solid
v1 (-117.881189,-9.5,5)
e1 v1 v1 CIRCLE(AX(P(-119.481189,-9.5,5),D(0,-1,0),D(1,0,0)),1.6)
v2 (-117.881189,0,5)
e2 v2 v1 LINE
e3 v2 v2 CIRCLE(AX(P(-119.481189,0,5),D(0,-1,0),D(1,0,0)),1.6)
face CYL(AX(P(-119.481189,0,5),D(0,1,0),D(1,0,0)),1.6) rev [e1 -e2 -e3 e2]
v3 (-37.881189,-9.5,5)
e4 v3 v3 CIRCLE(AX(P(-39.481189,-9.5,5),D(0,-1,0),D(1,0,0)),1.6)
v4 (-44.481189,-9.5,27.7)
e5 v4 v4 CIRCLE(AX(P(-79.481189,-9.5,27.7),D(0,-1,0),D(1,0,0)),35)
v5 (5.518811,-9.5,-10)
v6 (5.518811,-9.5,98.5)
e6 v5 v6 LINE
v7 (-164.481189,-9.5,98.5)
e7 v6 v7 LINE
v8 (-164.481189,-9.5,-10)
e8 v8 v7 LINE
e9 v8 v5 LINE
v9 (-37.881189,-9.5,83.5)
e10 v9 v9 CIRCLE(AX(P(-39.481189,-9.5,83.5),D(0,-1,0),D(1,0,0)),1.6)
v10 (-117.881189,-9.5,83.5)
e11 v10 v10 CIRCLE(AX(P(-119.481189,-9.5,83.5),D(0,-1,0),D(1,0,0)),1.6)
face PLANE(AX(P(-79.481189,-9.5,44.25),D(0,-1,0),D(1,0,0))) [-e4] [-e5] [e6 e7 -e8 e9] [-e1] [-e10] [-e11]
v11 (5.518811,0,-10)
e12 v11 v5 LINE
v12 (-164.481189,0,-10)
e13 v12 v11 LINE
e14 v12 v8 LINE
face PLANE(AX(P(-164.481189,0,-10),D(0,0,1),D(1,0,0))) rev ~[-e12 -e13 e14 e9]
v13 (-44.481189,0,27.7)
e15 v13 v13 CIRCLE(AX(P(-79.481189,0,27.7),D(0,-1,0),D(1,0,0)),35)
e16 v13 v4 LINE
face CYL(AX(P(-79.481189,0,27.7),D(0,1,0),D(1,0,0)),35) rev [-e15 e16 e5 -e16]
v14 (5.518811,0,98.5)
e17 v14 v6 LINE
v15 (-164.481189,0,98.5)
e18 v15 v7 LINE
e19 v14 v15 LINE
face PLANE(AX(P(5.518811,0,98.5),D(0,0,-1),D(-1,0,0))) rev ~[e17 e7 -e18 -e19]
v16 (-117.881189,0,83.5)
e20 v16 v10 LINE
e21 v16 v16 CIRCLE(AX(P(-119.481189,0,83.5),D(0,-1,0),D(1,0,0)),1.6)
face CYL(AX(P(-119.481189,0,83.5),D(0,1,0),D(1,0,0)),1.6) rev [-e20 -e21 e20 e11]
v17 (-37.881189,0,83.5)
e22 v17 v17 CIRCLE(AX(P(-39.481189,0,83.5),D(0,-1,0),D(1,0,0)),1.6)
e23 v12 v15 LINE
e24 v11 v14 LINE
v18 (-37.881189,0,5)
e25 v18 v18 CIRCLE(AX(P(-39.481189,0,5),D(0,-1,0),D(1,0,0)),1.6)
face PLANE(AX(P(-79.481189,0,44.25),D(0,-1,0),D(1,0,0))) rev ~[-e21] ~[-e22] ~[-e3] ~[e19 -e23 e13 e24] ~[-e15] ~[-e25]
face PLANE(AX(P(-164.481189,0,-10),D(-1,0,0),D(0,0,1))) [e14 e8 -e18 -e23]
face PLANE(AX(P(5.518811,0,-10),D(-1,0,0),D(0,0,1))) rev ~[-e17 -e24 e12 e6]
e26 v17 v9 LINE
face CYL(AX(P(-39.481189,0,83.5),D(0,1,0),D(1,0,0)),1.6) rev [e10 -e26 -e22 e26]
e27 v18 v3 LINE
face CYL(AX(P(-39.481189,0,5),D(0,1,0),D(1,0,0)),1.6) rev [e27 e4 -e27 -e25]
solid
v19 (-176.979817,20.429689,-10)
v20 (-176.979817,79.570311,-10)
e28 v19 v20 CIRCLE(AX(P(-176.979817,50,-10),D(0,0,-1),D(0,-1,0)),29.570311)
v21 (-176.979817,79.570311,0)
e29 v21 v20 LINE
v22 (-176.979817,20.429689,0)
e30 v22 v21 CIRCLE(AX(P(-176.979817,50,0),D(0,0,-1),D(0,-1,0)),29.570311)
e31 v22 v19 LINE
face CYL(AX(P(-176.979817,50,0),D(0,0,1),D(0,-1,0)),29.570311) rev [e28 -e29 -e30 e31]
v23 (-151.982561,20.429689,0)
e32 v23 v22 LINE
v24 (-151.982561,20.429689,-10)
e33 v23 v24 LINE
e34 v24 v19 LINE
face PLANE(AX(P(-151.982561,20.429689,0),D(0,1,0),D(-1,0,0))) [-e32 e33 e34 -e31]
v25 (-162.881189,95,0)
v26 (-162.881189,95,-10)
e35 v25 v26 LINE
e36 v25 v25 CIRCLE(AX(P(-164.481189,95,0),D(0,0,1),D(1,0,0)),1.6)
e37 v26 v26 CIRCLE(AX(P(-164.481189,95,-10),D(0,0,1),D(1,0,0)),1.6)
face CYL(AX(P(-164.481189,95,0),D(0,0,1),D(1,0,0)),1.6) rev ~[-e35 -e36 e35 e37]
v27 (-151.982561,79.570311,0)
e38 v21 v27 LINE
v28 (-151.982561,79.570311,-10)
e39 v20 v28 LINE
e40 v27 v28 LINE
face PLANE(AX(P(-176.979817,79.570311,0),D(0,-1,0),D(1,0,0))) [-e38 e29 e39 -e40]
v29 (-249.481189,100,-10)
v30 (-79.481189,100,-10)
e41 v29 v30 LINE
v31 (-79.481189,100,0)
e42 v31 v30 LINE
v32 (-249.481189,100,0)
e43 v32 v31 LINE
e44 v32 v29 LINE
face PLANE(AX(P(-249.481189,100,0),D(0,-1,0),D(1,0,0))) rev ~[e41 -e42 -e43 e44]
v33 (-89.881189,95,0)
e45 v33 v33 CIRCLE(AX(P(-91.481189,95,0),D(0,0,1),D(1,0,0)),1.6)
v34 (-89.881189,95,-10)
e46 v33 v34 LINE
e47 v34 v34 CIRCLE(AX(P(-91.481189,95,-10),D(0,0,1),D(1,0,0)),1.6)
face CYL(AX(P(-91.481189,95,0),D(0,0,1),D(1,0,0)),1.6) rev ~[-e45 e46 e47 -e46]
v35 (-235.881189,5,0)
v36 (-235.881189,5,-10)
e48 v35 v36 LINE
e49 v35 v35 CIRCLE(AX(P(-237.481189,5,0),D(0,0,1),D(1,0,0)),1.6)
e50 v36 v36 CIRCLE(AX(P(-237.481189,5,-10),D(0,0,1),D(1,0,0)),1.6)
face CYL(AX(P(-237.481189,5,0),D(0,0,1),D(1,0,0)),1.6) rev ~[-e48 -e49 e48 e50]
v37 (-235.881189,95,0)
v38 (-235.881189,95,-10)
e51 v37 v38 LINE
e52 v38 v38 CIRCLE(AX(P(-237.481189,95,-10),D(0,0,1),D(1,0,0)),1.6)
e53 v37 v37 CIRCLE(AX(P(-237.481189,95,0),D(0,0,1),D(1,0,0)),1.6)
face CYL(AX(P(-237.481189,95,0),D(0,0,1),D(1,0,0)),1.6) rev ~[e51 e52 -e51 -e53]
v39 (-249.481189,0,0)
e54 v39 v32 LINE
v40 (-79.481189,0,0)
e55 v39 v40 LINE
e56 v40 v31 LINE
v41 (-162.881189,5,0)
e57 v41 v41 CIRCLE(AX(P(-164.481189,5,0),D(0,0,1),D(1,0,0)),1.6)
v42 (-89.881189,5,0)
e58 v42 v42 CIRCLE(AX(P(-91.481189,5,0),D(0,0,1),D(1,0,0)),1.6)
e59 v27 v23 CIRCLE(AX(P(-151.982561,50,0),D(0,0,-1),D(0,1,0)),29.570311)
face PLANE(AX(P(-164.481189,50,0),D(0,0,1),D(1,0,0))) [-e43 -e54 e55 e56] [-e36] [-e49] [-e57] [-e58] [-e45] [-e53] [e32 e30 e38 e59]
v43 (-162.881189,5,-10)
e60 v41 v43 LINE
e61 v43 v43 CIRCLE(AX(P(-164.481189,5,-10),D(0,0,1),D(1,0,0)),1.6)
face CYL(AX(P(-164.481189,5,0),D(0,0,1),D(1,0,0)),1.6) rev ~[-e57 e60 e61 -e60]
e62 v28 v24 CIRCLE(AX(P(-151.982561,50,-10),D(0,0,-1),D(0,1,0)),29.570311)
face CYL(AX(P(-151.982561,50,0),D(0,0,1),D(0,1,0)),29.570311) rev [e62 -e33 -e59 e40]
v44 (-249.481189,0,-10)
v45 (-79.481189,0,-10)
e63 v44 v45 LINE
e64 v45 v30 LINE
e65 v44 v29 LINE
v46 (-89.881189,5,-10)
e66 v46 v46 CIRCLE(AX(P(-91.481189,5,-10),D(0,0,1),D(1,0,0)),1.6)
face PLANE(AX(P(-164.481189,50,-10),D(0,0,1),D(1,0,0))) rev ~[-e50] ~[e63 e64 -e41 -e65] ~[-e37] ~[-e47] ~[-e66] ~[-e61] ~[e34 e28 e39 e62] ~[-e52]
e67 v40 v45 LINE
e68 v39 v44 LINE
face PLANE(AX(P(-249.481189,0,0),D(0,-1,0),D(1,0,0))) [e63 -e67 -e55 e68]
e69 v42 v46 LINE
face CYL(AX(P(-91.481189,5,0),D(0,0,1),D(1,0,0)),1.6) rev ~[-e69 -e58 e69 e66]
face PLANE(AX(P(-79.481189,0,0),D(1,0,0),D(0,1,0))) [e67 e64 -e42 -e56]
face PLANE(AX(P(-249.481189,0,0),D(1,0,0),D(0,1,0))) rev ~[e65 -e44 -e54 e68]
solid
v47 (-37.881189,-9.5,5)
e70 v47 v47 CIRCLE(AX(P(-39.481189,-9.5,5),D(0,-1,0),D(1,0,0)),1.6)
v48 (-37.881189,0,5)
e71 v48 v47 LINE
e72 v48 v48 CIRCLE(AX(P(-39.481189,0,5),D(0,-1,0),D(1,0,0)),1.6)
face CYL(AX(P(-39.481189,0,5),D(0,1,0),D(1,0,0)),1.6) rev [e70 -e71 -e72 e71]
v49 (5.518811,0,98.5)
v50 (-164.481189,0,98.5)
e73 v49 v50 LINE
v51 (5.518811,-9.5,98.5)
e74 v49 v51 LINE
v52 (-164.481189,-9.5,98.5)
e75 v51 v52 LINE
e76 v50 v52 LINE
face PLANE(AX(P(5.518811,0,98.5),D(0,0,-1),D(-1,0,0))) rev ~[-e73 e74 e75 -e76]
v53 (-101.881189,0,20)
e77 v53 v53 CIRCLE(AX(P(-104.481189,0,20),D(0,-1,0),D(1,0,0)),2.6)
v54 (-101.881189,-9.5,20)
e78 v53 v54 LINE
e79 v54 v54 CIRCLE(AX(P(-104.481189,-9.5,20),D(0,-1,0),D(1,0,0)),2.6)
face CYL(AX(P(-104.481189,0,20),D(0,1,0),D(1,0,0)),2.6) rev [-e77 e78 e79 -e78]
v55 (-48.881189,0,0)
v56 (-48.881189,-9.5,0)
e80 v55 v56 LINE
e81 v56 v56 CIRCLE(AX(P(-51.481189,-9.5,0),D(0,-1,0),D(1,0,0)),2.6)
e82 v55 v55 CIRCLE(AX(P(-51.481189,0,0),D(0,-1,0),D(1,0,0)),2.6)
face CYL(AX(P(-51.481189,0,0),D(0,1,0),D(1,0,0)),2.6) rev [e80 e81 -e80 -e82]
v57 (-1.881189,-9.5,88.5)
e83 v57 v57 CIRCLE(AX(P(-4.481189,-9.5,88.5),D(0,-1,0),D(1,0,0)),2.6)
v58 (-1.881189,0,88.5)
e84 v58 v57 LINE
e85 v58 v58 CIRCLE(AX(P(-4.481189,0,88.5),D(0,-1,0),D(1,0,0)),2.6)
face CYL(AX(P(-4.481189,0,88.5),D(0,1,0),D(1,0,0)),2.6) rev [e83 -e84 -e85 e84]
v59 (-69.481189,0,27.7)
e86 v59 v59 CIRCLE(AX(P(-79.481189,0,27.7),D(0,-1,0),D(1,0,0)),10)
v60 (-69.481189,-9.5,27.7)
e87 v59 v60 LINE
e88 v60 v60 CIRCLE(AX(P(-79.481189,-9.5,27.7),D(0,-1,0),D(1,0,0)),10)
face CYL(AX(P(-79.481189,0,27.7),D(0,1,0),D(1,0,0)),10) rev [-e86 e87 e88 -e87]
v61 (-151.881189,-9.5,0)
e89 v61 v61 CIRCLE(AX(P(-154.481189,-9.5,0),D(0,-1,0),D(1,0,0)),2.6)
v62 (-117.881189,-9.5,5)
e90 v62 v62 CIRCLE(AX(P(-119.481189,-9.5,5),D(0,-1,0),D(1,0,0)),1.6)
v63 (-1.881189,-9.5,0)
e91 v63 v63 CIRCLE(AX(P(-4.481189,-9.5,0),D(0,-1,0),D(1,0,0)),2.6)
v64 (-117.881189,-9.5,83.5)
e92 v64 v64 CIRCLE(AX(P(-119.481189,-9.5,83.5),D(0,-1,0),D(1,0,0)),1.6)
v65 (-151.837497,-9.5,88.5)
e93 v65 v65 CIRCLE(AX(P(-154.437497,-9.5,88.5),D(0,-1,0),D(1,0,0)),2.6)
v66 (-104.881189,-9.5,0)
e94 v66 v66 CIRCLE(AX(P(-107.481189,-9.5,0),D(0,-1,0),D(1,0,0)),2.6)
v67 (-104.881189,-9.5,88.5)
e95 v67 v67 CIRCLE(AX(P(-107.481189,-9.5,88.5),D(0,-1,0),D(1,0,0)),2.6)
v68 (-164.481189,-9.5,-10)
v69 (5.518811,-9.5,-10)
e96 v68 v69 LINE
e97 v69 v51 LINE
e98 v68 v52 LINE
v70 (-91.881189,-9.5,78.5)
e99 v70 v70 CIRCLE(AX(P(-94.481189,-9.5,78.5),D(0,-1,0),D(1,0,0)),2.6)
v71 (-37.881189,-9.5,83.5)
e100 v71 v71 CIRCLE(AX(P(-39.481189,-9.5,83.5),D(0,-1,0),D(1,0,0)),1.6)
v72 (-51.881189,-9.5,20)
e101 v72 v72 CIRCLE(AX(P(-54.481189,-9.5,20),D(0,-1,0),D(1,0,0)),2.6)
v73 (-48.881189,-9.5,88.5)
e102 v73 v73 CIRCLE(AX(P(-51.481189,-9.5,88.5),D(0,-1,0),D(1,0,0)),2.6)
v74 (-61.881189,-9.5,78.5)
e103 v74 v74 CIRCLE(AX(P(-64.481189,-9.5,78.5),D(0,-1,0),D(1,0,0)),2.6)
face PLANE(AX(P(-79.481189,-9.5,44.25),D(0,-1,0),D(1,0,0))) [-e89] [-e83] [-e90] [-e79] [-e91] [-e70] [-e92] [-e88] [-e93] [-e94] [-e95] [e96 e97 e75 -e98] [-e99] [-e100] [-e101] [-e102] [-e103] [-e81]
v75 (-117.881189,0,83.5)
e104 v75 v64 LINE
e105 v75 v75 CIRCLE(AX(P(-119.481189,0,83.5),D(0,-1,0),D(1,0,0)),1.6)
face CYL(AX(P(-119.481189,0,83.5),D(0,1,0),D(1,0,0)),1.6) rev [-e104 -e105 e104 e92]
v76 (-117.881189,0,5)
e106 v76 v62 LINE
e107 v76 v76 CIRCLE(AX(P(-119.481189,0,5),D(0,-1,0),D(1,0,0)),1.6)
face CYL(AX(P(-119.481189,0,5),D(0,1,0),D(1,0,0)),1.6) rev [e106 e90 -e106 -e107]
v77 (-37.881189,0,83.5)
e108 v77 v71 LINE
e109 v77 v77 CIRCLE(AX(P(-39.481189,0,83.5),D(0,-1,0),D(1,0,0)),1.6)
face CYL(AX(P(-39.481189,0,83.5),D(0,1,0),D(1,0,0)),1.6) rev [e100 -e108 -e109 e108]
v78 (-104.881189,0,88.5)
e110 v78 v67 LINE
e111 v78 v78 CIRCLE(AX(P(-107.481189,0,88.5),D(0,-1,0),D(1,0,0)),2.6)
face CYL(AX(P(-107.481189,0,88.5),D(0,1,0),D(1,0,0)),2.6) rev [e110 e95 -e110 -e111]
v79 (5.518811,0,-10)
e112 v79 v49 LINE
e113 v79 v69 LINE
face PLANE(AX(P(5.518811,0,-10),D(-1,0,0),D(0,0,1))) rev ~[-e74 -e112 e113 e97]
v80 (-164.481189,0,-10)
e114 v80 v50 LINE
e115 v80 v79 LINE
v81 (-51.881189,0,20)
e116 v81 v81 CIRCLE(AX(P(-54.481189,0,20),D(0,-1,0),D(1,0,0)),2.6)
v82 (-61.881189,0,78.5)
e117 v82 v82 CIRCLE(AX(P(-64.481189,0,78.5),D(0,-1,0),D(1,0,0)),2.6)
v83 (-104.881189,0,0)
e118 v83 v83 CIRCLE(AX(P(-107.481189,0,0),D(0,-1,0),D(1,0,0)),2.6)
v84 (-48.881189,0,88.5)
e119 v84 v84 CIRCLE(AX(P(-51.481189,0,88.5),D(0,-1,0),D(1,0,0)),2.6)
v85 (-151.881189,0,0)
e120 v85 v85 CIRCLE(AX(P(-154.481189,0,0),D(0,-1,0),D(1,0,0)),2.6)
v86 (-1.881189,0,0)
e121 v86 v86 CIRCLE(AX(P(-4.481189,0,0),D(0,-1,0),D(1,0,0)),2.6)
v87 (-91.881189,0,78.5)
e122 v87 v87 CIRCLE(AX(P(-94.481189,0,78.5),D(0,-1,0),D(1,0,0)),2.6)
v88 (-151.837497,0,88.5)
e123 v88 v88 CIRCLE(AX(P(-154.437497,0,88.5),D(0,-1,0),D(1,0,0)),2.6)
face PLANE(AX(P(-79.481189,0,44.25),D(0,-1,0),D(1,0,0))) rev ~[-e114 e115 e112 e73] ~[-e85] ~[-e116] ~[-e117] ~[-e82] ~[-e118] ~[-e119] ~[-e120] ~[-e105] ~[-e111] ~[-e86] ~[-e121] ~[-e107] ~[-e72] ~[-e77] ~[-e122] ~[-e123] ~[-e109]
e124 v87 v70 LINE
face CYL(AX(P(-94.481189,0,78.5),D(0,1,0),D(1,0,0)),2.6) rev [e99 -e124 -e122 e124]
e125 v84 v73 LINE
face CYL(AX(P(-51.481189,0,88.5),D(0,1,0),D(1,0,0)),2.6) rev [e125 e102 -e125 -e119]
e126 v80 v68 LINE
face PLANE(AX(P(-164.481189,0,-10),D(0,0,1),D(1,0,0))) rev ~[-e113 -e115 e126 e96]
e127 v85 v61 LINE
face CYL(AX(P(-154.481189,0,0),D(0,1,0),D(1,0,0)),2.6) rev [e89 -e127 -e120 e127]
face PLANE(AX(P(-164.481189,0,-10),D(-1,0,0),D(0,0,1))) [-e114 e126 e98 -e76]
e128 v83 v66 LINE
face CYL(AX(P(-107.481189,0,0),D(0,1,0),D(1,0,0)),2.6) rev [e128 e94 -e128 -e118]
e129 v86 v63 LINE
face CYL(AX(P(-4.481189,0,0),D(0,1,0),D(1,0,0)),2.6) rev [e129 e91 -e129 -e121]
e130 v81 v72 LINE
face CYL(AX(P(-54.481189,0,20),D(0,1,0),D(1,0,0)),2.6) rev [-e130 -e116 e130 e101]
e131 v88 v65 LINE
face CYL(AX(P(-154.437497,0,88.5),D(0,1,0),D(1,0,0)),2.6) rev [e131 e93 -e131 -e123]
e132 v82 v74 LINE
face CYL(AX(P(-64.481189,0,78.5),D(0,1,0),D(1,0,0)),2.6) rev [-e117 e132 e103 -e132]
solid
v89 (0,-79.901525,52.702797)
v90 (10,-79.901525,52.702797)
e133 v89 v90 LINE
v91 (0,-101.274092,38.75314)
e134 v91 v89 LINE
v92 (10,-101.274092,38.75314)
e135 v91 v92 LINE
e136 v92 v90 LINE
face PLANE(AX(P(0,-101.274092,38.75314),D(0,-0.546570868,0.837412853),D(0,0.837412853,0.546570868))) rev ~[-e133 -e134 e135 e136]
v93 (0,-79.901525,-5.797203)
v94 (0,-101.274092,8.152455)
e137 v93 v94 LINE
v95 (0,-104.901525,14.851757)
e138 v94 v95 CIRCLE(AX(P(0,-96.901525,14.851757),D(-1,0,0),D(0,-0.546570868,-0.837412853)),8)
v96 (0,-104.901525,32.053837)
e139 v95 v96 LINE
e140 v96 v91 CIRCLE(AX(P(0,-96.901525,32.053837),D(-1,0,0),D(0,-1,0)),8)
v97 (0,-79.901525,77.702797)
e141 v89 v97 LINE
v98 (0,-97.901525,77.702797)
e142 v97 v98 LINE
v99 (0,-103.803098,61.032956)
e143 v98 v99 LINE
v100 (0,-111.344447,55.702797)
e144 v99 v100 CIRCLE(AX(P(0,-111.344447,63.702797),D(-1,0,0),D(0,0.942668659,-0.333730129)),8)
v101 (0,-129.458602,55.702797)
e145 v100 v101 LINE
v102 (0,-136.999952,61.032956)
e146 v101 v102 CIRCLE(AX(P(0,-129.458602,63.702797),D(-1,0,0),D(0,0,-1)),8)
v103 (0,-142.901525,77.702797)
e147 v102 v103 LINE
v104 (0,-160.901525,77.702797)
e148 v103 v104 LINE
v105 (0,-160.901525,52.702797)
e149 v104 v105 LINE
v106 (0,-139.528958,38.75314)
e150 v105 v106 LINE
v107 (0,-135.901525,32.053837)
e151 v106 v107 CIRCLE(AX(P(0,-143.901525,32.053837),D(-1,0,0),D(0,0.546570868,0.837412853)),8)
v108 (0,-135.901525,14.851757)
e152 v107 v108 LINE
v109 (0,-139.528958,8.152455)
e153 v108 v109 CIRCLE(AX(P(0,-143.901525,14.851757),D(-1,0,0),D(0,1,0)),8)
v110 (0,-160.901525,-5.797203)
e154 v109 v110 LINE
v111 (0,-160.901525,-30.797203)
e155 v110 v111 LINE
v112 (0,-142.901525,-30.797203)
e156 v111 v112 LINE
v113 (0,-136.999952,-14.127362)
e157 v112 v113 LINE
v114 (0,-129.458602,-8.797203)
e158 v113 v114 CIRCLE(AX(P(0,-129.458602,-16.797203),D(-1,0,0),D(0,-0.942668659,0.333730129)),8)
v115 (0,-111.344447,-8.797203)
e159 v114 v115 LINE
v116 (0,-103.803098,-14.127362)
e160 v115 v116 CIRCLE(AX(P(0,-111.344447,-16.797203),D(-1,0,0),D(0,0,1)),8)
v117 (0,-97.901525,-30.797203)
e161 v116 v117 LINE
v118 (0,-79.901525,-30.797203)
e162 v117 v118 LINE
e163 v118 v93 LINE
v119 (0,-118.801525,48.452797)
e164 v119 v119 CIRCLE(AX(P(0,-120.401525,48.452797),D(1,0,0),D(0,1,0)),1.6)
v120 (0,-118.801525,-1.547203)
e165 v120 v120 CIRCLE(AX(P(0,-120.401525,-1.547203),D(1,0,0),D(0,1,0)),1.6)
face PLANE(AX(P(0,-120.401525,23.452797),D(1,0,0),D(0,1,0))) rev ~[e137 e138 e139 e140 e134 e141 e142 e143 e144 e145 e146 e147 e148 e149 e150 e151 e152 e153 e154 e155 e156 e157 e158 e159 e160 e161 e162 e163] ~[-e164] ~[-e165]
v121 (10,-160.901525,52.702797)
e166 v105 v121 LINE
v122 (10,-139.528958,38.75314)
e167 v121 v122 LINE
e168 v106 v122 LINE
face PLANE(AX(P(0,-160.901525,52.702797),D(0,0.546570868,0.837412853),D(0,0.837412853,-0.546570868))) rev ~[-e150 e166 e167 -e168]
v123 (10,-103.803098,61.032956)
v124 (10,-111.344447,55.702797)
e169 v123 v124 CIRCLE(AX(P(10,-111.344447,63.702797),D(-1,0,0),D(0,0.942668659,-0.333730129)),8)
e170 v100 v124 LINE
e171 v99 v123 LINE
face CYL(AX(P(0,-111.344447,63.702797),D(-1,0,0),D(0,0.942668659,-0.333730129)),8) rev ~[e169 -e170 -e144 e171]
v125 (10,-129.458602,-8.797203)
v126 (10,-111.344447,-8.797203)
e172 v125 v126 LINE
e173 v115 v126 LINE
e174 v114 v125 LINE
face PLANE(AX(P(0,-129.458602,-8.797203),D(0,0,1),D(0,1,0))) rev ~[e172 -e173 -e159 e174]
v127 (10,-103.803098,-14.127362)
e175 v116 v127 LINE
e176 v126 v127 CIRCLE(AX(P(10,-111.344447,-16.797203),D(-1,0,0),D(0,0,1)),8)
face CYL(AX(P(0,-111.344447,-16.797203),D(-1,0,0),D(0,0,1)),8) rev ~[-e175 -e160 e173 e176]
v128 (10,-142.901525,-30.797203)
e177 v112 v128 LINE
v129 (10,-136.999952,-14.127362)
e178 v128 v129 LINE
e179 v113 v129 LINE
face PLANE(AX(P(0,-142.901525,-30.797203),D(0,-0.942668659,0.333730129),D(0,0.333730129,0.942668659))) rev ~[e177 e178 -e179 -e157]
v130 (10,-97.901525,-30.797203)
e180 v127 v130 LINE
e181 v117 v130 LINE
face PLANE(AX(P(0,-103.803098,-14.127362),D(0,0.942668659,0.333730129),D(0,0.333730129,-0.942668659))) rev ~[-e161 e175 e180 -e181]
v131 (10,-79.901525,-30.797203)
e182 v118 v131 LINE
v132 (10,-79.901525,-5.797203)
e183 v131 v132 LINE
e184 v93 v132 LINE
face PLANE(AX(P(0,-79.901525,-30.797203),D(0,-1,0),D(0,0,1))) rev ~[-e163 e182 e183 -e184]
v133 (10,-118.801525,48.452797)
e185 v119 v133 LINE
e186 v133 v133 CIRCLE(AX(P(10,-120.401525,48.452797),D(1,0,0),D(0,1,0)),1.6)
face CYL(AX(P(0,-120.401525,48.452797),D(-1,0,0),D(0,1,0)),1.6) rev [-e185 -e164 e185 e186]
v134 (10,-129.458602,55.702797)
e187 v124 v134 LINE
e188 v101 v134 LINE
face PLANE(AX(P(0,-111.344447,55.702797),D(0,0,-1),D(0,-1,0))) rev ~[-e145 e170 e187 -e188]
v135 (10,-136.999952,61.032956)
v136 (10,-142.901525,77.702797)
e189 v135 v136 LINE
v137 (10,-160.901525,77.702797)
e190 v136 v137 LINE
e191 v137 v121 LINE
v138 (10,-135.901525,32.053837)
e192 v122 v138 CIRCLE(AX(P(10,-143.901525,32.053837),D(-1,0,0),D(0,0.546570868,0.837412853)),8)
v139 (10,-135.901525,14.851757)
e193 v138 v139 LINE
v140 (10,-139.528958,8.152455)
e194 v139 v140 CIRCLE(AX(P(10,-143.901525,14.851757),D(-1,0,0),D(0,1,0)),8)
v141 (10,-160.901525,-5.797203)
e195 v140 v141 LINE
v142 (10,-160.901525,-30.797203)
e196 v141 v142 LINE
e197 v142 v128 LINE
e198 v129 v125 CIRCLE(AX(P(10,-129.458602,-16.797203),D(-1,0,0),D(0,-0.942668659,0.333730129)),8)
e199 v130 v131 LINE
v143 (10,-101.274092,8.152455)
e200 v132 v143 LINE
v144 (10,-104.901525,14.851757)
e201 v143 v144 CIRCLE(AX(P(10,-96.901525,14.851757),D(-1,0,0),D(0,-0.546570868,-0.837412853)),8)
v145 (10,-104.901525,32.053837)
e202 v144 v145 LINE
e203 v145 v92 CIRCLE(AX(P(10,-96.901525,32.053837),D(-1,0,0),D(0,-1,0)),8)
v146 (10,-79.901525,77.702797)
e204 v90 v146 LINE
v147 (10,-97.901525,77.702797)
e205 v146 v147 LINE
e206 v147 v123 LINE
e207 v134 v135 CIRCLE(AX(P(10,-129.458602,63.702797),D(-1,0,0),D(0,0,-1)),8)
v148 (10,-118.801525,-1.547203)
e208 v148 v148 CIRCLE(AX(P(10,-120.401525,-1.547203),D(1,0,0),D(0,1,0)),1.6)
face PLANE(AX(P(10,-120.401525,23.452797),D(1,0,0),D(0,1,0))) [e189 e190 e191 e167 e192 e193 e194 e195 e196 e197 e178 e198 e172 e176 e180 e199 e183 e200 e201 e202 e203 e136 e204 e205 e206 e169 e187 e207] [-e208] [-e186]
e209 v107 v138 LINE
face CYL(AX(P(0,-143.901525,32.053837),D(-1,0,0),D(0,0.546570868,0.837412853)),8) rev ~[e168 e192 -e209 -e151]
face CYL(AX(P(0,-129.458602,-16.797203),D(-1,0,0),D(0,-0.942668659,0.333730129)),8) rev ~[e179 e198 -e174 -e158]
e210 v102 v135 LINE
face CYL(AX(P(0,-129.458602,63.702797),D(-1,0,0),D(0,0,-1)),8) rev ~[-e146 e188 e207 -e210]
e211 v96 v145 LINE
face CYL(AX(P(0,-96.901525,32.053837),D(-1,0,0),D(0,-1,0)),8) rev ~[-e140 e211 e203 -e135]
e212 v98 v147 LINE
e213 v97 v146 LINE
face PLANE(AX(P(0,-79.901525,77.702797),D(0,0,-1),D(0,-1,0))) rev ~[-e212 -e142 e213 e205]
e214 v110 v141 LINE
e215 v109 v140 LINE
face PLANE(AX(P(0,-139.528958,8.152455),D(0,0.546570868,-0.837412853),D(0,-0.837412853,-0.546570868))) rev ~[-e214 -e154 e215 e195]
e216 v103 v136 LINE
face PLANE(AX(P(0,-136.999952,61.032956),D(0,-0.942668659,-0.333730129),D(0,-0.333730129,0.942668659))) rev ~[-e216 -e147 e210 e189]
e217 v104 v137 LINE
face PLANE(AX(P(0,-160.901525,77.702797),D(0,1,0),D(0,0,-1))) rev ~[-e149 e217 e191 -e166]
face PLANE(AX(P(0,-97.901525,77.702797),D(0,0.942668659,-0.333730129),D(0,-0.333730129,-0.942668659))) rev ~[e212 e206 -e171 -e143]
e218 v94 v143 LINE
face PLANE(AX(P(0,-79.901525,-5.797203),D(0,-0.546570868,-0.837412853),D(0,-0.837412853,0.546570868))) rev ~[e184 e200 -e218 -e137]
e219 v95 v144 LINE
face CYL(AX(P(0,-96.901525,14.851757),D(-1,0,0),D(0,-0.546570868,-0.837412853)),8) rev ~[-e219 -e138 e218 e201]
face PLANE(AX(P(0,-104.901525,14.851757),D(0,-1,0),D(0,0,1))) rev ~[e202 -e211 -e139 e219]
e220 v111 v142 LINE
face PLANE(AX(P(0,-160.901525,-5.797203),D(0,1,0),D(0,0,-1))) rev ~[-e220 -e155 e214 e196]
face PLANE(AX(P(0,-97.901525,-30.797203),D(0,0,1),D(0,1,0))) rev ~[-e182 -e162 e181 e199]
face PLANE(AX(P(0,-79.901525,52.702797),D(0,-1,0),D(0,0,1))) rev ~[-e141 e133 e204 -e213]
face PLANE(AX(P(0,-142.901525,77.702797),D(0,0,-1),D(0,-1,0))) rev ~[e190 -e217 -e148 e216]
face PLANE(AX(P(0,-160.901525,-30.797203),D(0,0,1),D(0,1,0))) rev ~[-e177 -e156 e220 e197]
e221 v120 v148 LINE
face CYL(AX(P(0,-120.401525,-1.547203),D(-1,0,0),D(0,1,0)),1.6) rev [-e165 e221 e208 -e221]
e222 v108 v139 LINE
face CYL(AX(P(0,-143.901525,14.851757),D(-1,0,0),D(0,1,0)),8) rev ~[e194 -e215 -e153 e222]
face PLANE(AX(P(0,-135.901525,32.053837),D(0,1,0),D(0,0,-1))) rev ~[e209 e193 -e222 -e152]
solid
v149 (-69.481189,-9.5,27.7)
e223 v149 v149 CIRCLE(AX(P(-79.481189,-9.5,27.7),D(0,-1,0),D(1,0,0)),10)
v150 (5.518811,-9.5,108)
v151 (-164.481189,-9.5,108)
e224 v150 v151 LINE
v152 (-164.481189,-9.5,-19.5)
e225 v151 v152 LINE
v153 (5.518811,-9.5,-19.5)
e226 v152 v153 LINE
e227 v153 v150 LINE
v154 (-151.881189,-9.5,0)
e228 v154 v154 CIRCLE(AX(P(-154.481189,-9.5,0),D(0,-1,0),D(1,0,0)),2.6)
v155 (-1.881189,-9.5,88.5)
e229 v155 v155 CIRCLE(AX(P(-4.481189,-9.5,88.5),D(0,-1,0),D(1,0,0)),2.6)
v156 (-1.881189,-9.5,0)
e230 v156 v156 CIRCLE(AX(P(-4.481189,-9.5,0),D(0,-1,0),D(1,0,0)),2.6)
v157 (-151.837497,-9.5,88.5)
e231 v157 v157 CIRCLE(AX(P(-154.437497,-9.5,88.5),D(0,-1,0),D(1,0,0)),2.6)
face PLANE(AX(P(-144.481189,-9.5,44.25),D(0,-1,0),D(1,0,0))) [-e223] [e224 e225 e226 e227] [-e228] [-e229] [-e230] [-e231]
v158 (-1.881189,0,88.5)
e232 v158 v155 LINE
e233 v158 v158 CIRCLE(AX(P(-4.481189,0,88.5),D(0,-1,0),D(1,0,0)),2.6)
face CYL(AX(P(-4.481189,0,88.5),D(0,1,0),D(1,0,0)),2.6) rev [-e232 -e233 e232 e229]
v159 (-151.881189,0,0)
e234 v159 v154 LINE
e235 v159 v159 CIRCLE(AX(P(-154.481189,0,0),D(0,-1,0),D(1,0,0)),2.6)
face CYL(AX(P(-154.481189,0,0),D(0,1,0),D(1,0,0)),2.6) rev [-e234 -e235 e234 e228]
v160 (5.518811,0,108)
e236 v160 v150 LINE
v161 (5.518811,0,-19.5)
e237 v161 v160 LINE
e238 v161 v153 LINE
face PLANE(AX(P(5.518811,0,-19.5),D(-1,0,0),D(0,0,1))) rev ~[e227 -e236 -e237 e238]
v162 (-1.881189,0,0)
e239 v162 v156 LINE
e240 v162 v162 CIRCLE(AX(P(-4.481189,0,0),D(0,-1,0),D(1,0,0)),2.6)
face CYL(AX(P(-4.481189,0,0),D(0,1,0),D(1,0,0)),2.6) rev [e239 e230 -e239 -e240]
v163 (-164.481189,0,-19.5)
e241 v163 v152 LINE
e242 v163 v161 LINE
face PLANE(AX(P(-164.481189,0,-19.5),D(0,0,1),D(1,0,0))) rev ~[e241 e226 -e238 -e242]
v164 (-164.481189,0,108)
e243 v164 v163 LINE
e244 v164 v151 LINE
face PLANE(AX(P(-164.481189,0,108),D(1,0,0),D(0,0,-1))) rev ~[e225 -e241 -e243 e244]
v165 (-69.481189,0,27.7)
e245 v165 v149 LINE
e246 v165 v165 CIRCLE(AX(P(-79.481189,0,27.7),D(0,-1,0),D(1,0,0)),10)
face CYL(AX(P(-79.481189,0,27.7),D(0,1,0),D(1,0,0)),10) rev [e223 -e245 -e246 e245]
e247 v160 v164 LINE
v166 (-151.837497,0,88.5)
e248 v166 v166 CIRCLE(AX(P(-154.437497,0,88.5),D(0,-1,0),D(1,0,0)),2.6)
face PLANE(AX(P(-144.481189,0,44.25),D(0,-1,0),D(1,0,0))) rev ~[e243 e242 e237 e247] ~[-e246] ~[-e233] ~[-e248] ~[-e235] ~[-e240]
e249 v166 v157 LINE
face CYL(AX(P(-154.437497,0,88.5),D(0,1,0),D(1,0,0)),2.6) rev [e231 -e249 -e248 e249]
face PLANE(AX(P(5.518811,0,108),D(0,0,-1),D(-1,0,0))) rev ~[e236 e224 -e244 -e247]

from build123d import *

# Parameters (mm, degrees)
F0_W     = 90
F0_H     = 108.5
F0_R     = 2.6
F0_R_2   = 1.6
F0_R_3   = 35
F0_R_4   = 10
F0_W_2   = 40
F1_DEPTH = 9.5
F2_W     = 170
F2_H     = 100
F2_R     = 1.6
F3_DEPTH = 10
F4_R     = 1.6
F5_DEPTH = 10
F6_DEPTH = 9.5
F7_DEPTH = 9.5


# Not quite as in the source:
# - a feature names something its author has since deleted; it is built from what else it names


with BuildPart() as f1:
    # F0 (on Front) → F1 (new body)
    with BuildSketch(Plane.XZ):
        with Locations((-79.4811890348, 44.25)):
            Rectangle(F0_W, F0_H)
        with Locations((-107.4811890348, 0)):
            Circle(F0_R, mode=Mode.SUBTRACT)
        with Locations((-119.4811890348, 5)):
            Circle(F0_R_2, mode=Mode.SUBTRACT)
        with Locations((-51.4811890348, 0)):
            Circle(F0_R, mode=Mode.SUBTRACT)
        with Locations((-39.4811890348, 5)):
            Circle(F0_R_2, mode=Mode.SUBTRACT)
        with Locations((-79.4811890348, 27.7)):
            Circle(F0_R_3, mode=Mode.SUBTRACT)
        with Locations((-119.4811890348, 83.5)):
            Circle(F0_R_2, mode=Mode.SUBTRACT)
        with Locations((-107.4811890348, 88.5)):
            Circle(F0_R, mode=Mode.SUBTRACT)
        with Locations((-94.4811890348, 78.5)):
            Circle(F0_R, mode=Mode.SUBTRACT)
        with Locations((-64.4811890348, 78.5)):
            Circle(F0_R, mode=Mode.SUBTRACT)
        with Locations((-39.4811890348, 83.5)):
            Circle(F0_R_2, mode=Mode.SUBTRACT)
        with Locations((-51.4811890348, 88.5)):
            Circle(F0_R, mode=Mode.SUBTRACT)
        with Locations((-79.4811890348, 27.7)):
            Circle(F0_R_3)
        with Locations((-104.4811890348, 20)):
            Circle(F0_R, mode=Mode.SUBTRACT)
        with Locations((-79.4811890348, 27.7)):
            Circle(F0_R_4, mode=Mode.SUBTRACT)
        with Locations((-54.4811890348, 20)):
            Circle(F0_R, mode=Mode.SUBTRACT)
        with Locations((-144.4811890348, 44.25)):
            Rectangle(F0_W_2, F0_H)
        with Locations((-154.4811890348, 0)):
            Circle(F0_R, mode=Mode.SUBTRACT)
        with Locations((-154.4374972582, 88.5)):
            Circle(F0_R, mode=Mode.SUBTRACT)
        with Locations((-14.4811890348, 44.25)):
            Rectangle(F0_W_2, F0_H)
        with Locations((-4.4811890348, 0)):
            Circle(F0_R, mode=Mode.SUBTRACT)
        with Locations((-4.4811890348, 88.5)):
            Circle(F0_R, mode=Mode.SUBTRACT)
    extrude(amount=F1_DEPTH)


with BuildPart() as f3:
    # F2 (on Top) → F3 (new body)
    with BuildSketch(Plane.XY):
        with Locations((-164.4811890348, 50)):
            Rectangle(F2_W, F2_H)
        with Locations((-237.4811890348, 5)):
            Circle(F2_R, mode=Mode.SUBTRACT)
        with Locations((-164.4811890348, 5)):
            Circle(F2_R, mode=Mode.SUBTRACT)
        with Locations((-91.4811890348, 5)):
            Circle(F2_R, mode=Mode.SUBTRACT)
        with Locations((-237.4811890348, 95)):
            Circle(F2_R, mode=Mode.SUBTRACT)
        with Locations((-164.4811890348, 95)):
            Circle(F2_R, mode=Mode.SUBTRACT)
        with BuildLine():
            Line((-151.9825607538, 20.4296894372), (-176.9798173157, 20.4296894372))
            ThreePointArc((-176.9798173157, 20.4296894372), (-206.5501278786, 50), (-176.9798173157, 79.5703105628))
            Line((-176.9798173157, 79.5703105628), (-151.9825607538, 79.5703105628))
            ThreePointArc((-151.9825607538, 79.5703105628), (-122.412250191, 50), (-151.9825607538, 20.4296894372))
        make_face(mode=Mode.SUBTRACT)
        with Locations((-91.4811890348, 95)):
            Circle(F2_R, mode=Mode.SUBTRACT)
    extrude(amount=-F3_DEPTH)


with BuildPart() as f5:
    # F4 (on Right) → F5 (new body)
    with BuildSketch(Plane.YZ):
        with BuildLine():
            Line((-142.9015249014, 77.7027970647), (-160.9015249014, 77.7027970647))
            Line((-160.9015249014, 77.7027970647), (-160.9015249014, 52.7027970647))
            Line((-160.9015249014, 52.7027970647), (-139.5289579594, 38.7531395972))
            ThreePointArc((-139.5289579594, 38.7531395972), (-136.8665929353, 35.8630010157), (-135.9015249014, 32.0538367724))
            Line((-135.9015249014, 32.0538367724), (-135.9015249014, 14.851757357))
            ThreePointArc((-135.9015249014, 14.851757357), (-136.8665929353, 11.0425931138), (-139.5289579594, 8.1524545323))
            Line((-139.5289579594, 8.1524545323), (-160.9015249014, -5.7972029353))
            Line((-160.9015249014, -5.7972029353), (-160.9015249014, -30.7972029353))
            Line((-160.9015249014, -30.7972029353), (-142.9015249014, -30.7972029353))
            Line((-142.9015249014, -30.7972029353), (-136.9999515848, -14.1273619005))
            ThreePointArc((-136.9999515848, -14.1273619005), (-134.0760297196, -10.2642584124), (-129.4586023124, -8.7972029353))
            Line((-129.4586023124, -8.7972029353), (-111.3444474904, -8.7972029353))
            ThreePointArc((-111.3444474904, -8.7972029353), (-106.7270200832, -10.2642584124), (-103.8030982179, -14.1273619005))
            Line((-103.8030982179, -14.1273619005), (-97.9015249014, -30.7972029353))
            Line((-97.9015249014, -30.7972029353), (-79.9015249014, -30.7972029353))
            Line((-79.9015249014, -30.7972029353), (-79.9015249014, -5.7972029353))
            Line((-79.9015249014, -5.7972029353), (-101.2740918434, 8.1524545323))
            ThreePointArc((-101.2740918434, 8.1524545323), (-103.9364568675, 11.0425931138), (-104.9015249014, 14.851757357))
            Line((-104.9015249014, 14.851757357), (-104.9015249014, 32.0538367724))
            ThreePointArc((-104.9015249014, 32.0538367724), (-103.9364568675, 35.8630010157), (-101.2740918434, 38.7531395972))
            Line((-101.2740918434, 38.7531395972), (-79.9015249014, 52.7027970647))
            Line((-79.9015249014, 52.7027970647), (-79.9015249014, 77.7027970647))
            Line((-79.9015249014, 77.7027970647), (-97.9015249014, 77.7027970647))
            Line((-97.9015249014, 77.7027970647), (-103.8030982179, 61.03295603))
            ThreePointArc((-103.8030982179, 61.03295603), (-106.7270200832, 57.1698525419), (-111.3444474904, 55.7027970647))
            Line((-111.3444474904, 55.7027970647), (-129.4586023124, 55.7027970647))
            ThreePointArc((-129.4586023124, 55.7027970647), (-134.0760297196, 57.1698525419), (-136.9999515848, 61.03295603))
            Line((-136.9999515848, 61.03295603), (-142.9015249014, 77.7027970647))
        make_face()
        with Locations((-120.4015249014, -1.5472029353)):
            Circle(F4_R, mode=Mode.SUBTRACT)
        with Locations((-120.4015249014, 48.4527970647)):
            Circle(F4_R, mode=Mode.SUBTRACT)
    extrude(amount=F5_DEPTH)


with BuildPart() as f6:
    # F0 (on Front) → F6 (new body)
    with BuildSketch(Plane.XZ):
        with Locations((-79.4811890348, 44.25)):
            Rectangle(F0_W, F0_H)
        with Locations((-107.4811890348, 0)):
            Circle(F0_R, mode=Mode.SUBTRACT)
        with Locations((-119.4811890348, 5)):
            Circle(F0_R_2, mode=Mode.SUBTRACT)
        with Locations((-51.4811890348, 0)):
            Circle(F0_R, mode=Mode.SUBTRACT)
        with Locations((-39.4811890348, 5)):
            Circle(F0_R_2, mode=Mode.SUBTRACT)
        with Locations((-79.4811890348, 27.7)):
            Circle(F0_R_3, mode=Mode.SUBTRACT)
        with Locations((-119.4811890348, 83.5)):
            Circle(F0_R_2, mode=Mode.SUBTRACT)
        with Locations((-107.4811890348, 88.5)):
            Circle(F0_R, mode=Mode.SUBTRACT)
        with Locations((-94.4811890348, 78.5)):
            Circle(F0_R, mode=Mode.SUBTRACT)
        with Locations((-64.4811890348, 78.5)):
            Circle(F0_R, mode=Mode.SUBTRACT)
        with Locations((-39.4811890348, 83.5)):
            Circle(F0_R_2, mode=Mode.SUBTRACT)
        with Locations((-51.4811890348, 88.5)):
            Circle(F0_R, mode=Mode.SUBTRACT)
        with Locations((-51.4811890348, 0)):
            Circle(F0_R)
        with Locations((-14.4811890348, 44.25)):
            Rectangle(F0_W_2, F0_H)
        with Locations((-4.4811890348, 0)):
            Circle(F0_R, mode=Mode.SUBTRACT)
        with Locations((-4.4811890348, 88.5)):
            Circle(F0_R, mode=Mode.SUBTRACT)
        with Locations((-107.4811890348, 0)):
            Circle(F0_R)
        with Locations((-94.4811890348, 78.5)):
            Circle(F0_R)
        with Locations((-64.4811890348, 78.5)):
            Circle(F0_R)
        with Locations((-51.4811890348, 88.5)):
            Circle(F0_R)
        with Locations((-107.4811890348, 88.5)):
            Circle(F0_R)
        with Locations((-144.4811890348, 44.25)):
            Rectangle(F0_W_2, F0_H)
        with Locations((-154.4811890348, 0)):
            Circle(F0_R, mode=Mode.SUBTRACT)
        with Locations((-154.4374972582, 88.5)):
            Circle(F0_R, mode=Mode.SUBTRACT)
        with Locations((-4.4811890348, 88.5)):
            Circle(F0_R)
        with Locations((-4.4811890348, 0)):
            Circle(F0_R)
        with Locations((-154.4811890348, 0)):
            Circle(F0_R)
        with Locations((-154.4374972582, 88.5)):
            Circle(F0_R)
    extrude(amount=F6_DEPTH)


with BuildPart() as f7:
    # F0 (on Front) → F7 (new body)
    with BuildSketch(Plane.XZ):
        with Locations((-144.4811890348, 44.25)):
            Rectangle(F0_W_2, F0_H)
        with Locations((-154.4811890348, 0)):
            Circle(F0_R, mode=Mode.SUBTRACT)
        with Locations((-154.4374972582, 88.5)):
            Circle(F0_R, mode=Mode.SUBTRACT)
        Polygon((-34.4811890348, -10), (-124.4811890348, -10), (-164.4811890348, -10), (-164.4811890348, -19.5), (5.5188109652, -19.5), (5.5188109652, -10), align=None)
        with Locations((-14.4811890348, 44.25)):
            Rectangle(F0_W_2, F0_H)
        with Locations((-4.4811890348, 0)):
            Circle(F0_R, mode=Mode.SUBTRACT)
        with Locations((-4.4811890348, 88.5)):
            Circle(F0_R, mode=Mode.SUBTRACT)
        Polygon((-164.4811890348, 98.5), (-124.4811890348, 98.5), (-34.4811890348, 98.5), (5.5188109652, 98.5), (5.5188109652, 108), (-164.4811890348, 108), align=None)
        with Locations((-79.4811890348, 44.25)):
            Rectangle(F0_W, F0_H)
        with Locations((-107.4811890348, 0)):
            Circle(F0_R, mode=Mode.SUBTRACT)
        with Locations((-119.4811890348, 5)):
            Circle(F0_R_2, mode=Mode.SUBTRACT)
        with Locations((-51.4811890348, 0)):
            Circle(F0_R, mode=Mode.SUBTRACT)
        with Locations((-39.4811890348, 5)):
            Circle(F0_R_2, mode=Mode.SUBTRACT)
        with Locations((-79.4811890348, 27.7)):
            Circle(F0_R_3, mode=Mode.SUBTRACT)
        with Locations((-119.4811890348, 83.5)):
            Circle(F0_R_2, mode=Mode.SUBTRACT)
        with Locations((-107.4811890348, 88.5)):
            Circle(F0_R, mode=Mode.SUBTRACT)
        with Locations((-94.4811890348, 78.5)):
            Circle(F0_R, mode=Mode.SUBTRACT)
        with Locations((-64.4811890348, 78.5)):
            Circle(F0_R, mode=Mode.SUBTRACT)
        with Locations((-39.4811890348, 83.5)):
            Circle(F0_R_2, mode=Mode.SUBTRACT)
        with Locations((-51.4811890348, 88.5)):
            Circle(F0_R, mode=Mode.SUBTRACT)
        with Locations((-79.4811890348, 27.7)):
            Circle(F0_R_3)
        with Locations((-104.4811890348, 20)):
            Circle(F0_R, mode=Mode.SUBTRACT)
        with Locations((-79.4811890348, 27.7)):
            Circle(F0_R_4, mode=Mode.SUBTRACT)
        with Locations((-54.4811890348, 20)):
            Circle(F0_R, mode=Mode.SUBTRACT)
        with Locations((-51.4811890348, 0)):
            Circle(F0_R)
        with Locations((-54.4811890348, 20)):
            Circle(F0_R)
        with Locations((-104.4811890348, 20)):
            Circle(F0_R)
        with Locations((-107.4811890348, 0)):
            Circle(F0_R)
        with Locations((-119.4811890348, 5)):
            Circle(F0_R_2)
        with Locations((-51.4811890348, 88.5)):
            Circle(F0_R)
        with Locations((-64.4811890348, 78.5)):
            Circle(F0_R)
        with Locations((-94.4811890348, 78.5)):
            Circle(F0_R)
        with Locations((-107.4811890348, 88.5)):
            Circle(F0_R)
        with Locations((-119.4811890348, 83.5)):
            Circle(F0_R_2)
        with Locations((-39.4811890348, 83.5)):
            Circle(F0_R_2)
        with Locations((-39.4811890348, 5)):
            Circle(F0_R_2)
    extrude(amount=F7_DEPTH)


solid = Compound([f1.part, f3.part, f5.part, f6.part, f7.part])
